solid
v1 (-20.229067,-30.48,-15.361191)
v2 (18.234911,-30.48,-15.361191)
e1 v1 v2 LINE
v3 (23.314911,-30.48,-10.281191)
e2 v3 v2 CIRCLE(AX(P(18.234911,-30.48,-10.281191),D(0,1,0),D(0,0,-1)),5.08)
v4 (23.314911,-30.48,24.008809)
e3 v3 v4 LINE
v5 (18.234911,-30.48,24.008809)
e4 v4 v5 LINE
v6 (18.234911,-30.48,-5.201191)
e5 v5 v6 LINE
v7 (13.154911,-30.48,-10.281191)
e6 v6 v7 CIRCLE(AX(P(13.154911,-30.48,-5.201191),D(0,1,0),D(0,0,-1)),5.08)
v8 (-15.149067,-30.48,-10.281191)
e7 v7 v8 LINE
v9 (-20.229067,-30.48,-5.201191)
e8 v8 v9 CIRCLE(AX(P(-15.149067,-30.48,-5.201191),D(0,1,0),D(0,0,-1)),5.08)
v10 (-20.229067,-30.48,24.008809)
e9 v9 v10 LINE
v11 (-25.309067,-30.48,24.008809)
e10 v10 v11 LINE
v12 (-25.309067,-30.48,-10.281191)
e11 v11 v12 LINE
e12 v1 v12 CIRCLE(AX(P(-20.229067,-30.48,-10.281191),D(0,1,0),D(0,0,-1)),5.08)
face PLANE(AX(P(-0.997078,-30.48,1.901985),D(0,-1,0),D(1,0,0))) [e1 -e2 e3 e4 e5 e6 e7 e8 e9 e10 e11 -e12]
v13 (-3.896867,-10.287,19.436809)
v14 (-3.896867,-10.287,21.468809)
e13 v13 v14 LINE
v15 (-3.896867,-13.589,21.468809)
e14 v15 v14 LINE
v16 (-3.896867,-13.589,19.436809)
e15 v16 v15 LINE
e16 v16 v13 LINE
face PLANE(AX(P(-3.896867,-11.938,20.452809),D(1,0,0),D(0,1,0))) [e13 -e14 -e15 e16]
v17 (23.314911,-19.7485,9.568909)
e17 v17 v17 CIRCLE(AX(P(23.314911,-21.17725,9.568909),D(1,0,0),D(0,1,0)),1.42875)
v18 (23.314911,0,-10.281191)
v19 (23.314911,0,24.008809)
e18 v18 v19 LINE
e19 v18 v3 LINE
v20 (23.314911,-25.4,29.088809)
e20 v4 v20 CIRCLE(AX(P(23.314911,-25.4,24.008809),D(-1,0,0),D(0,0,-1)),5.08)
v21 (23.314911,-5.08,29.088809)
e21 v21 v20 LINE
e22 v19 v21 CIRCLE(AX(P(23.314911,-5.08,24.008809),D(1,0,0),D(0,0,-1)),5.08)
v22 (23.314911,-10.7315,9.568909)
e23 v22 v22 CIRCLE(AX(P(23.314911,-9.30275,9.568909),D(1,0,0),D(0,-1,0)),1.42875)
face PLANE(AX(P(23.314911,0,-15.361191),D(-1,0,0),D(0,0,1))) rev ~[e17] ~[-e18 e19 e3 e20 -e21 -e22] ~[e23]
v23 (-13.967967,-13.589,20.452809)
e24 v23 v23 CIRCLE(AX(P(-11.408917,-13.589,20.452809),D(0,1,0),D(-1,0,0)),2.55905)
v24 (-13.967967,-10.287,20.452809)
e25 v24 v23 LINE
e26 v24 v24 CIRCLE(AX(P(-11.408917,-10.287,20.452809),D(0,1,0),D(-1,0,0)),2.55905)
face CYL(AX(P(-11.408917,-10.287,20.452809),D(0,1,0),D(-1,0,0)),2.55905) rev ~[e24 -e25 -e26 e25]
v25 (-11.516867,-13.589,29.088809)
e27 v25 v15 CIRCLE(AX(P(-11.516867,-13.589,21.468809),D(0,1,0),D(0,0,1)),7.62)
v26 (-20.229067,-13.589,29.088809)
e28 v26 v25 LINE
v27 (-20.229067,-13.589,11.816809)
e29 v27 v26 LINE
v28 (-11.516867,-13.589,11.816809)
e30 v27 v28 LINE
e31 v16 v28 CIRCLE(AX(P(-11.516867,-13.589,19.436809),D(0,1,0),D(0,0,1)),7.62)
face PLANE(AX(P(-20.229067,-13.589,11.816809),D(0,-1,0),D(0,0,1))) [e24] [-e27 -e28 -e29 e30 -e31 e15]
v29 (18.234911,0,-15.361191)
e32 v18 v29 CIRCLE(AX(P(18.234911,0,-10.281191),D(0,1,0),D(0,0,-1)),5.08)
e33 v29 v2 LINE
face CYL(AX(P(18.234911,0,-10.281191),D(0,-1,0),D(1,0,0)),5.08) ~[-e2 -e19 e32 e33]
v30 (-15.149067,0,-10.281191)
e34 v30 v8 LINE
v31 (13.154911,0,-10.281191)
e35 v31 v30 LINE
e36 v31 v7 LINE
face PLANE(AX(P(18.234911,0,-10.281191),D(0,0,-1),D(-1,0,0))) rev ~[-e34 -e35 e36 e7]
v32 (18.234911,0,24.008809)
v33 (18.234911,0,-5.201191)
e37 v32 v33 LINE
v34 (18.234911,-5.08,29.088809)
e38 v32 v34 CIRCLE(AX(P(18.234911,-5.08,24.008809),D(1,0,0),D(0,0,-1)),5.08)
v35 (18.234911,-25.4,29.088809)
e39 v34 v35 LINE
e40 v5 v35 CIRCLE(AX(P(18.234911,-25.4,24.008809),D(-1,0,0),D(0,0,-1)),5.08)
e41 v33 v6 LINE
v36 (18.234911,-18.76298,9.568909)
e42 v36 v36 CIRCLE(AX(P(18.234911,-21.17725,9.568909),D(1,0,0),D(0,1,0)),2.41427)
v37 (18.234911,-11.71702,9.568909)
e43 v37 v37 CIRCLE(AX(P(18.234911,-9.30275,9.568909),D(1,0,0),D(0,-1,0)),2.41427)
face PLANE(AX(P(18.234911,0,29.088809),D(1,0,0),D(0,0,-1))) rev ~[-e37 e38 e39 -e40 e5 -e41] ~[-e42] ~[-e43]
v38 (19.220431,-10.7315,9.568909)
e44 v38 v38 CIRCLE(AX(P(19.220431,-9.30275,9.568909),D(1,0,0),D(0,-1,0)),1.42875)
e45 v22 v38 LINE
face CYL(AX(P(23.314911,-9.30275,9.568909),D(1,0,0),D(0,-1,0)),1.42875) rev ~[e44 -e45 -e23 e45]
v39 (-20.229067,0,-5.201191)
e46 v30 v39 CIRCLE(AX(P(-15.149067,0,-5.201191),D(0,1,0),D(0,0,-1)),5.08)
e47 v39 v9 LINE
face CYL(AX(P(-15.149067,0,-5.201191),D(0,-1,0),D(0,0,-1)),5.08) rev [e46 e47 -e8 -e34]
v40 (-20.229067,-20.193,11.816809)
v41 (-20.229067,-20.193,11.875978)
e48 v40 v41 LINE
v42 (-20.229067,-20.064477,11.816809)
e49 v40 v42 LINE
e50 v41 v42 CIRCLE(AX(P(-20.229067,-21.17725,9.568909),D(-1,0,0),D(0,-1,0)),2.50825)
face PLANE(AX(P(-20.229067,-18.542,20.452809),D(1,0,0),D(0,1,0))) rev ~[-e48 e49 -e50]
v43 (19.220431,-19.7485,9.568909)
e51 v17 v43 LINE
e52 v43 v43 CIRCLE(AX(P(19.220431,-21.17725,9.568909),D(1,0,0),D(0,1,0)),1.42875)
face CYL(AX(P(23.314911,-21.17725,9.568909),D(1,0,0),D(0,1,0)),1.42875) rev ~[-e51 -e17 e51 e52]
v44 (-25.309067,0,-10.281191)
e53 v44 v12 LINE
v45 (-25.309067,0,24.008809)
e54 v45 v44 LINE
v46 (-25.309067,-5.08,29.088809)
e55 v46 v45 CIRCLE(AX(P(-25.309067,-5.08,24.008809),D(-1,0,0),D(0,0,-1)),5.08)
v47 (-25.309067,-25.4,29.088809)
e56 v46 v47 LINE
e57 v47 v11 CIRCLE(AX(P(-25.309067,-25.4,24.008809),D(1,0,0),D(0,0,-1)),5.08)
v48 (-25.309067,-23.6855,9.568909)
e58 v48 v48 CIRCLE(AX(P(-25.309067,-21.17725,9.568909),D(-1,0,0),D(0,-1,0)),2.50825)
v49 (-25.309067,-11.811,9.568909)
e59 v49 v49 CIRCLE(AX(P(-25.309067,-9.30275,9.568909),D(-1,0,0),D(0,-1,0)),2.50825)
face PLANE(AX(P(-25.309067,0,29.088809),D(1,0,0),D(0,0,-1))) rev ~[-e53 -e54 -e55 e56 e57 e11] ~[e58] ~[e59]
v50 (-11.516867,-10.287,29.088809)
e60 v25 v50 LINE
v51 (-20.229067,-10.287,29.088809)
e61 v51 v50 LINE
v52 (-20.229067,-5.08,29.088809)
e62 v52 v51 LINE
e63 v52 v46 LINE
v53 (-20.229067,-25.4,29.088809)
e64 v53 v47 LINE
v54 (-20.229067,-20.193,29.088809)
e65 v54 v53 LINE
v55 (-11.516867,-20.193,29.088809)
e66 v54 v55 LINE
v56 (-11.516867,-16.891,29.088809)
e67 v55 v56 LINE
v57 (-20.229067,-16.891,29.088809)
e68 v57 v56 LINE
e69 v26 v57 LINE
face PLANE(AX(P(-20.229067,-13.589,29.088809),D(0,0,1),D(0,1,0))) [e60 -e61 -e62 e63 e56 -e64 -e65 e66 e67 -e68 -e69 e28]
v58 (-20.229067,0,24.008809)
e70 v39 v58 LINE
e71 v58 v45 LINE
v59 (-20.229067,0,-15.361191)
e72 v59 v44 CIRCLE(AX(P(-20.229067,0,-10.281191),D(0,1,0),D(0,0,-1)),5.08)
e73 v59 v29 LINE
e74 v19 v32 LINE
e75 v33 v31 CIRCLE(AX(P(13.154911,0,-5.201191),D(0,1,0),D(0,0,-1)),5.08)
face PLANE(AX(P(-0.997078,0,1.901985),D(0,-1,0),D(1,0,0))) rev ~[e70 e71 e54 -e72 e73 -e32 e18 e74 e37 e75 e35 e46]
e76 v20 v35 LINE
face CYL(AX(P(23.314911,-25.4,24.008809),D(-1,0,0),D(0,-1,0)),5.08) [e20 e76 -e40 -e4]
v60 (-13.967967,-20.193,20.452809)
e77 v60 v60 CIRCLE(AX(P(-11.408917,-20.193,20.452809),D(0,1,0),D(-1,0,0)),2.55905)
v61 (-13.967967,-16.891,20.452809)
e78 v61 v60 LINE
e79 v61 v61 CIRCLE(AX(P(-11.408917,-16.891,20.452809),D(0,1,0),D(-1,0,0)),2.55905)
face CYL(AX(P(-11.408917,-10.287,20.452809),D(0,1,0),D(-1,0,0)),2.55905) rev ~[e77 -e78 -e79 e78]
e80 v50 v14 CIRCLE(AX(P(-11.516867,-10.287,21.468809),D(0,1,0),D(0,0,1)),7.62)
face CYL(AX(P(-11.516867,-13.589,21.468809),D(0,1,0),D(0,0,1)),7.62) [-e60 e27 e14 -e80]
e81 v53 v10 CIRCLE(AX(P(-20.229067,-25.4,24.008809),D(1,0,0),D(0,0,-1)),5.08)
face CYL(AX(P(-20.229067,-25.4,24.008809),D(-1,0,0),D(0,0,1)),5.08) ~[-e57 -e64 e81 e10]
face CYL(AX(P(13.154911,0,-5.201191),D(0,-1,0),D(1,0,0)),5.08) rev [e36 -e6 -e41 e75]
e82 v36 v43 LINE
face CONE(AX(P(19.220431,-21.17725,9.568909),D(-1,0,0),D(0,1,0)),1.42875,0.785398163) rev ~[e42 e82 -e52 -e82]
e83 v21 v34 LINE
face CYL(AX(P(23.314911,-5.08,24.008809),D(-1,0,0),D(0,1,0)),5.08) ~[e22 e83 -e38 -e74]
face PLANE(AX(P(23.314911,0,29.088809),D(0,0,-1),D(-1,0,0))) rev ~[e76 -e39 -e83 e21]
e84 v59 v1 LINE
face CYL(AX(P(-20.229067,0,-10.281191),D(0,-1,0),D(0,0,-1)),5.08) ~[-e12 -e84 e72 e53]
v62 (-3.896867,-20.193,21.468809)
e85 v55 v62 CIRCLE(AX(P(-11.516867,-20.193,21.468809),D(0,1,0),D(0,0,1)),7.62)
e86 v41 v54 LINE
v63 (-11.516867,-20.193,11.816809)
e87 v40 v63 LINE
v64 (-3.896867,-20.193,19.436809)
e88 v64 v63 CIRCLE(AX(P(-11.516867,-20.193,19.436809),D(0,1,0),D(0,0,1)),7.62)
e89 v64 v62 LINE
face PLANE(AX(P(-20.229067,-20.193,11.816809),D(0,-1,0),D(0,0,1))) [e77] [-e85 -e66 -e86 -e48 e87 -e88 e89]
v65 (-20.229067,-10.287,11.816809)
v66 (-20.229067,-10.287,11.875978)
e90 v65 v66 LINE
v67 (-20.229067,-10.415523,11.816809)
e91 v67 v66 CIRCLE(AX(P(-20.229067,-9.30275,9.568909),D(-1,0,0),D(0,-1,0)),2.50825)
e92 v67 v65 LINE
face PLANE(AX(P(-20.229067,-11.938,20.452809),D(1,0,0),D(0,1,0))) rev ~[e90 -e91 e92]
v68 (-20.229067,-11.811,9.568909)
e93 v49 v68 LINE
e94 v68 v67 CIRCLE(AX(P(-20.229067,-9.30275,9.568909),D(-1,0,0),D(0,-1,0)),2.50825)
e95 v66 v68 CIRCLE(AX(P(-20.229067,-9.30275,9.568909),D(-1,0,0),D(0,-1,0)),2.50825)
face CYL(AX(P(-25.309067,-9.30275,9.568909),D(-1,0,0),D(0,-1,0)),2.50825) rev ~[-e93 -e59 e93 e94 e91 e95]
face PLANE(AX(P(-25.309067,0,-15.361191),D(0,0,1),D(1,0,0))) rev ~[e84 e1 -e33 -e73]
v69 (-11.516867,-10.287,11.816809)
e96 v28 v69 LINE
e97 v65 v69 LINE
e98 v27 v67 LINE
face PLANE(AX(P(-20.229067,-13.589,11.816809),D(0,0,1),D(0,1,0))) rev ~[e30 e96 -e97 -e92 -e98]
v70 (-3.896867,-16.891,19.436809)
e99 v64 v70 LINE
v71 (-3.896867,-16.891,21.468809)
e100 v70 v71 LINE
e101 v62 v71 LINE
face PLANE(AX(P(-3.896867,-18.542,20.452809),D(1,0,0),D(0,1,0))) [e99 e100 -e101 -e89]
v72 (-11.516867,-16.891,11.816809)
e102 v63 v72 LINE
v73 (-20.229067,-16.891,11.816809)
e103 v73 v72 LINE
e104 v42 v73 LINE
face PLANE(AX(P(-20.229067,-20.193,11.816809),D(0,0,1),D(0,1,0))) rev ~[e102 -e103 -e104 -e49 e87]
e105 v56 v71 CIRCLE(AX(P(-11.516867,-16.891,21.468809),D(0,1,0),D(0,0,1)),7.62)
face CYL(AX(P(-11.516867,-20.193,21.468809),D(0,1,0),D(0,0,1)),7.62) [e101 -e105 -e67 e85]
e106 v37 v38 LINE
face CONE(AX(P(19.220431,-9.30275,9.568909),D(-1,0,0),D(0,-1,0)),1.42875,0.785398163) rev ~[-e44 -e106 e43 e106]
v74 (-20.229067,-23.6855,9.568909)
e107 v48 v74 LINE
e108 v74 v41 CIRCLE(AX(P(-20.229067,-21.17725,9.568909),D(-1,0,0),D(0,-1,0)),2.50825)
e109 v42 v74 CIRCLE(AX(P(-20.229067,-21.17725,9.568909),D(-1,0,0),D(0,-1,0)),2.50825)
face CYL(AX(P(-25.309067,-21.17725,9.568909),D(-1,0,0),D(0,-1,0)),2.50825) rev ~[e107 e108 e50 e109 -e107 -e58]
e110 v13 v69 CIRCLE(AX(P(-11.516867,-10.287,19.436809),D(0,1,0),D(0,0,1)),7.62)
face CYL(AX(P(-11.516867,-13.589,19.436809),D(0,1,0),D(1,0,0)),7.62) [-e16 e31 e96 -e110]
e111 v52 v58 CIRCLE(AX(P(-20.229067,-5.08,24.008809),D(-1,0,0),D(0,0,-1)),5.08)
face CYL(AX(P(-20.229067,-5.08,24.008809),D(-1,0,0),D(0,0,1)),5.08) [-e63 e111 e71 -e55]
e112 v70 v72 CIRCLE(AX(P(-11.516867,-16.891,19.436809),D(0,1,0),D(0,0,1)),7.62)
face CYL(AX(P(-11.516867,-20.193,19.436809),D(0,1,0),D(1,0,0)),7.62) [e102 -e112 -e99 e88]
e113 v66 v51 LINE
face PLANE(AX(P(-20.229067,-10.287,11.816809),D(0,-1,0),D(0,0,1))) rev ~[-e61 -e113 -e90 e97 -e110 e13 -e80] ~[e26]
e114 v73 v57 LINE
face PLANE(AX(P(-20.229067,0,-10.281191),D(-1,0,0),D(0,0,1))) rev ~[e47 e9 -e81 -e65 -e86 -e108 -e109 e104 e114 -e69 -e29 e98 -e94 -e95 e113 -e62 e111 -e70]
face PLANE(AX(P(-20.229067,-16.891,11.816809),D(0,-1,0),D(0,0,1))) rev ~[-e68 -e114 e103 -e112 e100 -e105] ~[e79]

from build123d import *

# Parameters (mm, degrees)
F1_DEPTH  = 30.48
F2_R      = 1.42875
F3_DEPTH  = 67.945
F4_R      = 5.08
F5_R      = 5.08
F6_R      = 5.08
F7_SIZE   = 0.98552
F8_R      = 2.50825
F9_DEPTH  = 18.161
F10_W     = 3.302
F10_H     = 17.272
F11_DEPTH = 16.3322
F12_R     = 5.08
F13_R     = 7.62
F14_R     = 7.62
F16_DEPTH = 25.4


# Not quite as in the source:
# - a feature names something its author has since deleted; it is built from what else it names


with BuildPart() as f1:
    # F0 (on Front) → F1 (new body)
    with BuildSketch(Plane.XZ):
        Polygon((-20.2290668074, 29.0888086691), (-25.3090668074, 29.0888086691), (-25.3090668074, -15.3611913309), (23.3149106546, -15.3611913309), (23.3149106546, 29.0888086691), (18.2349106546, 29.0888086691), (18.2349106546, -10.2811913309), (-20.2290668074, -10.2811913309), align=None)
    extrude(amount=F1_DEPTH)

    # F2 (on face) → F3 (cut)
    with BuildSketch(Plane.YZ.offset(23.3149106546)):
        with Locations((-21.17725, 9.5689086691)):
            Circle(F2_R)
        with BuildLine():
            ThreePointArc((-7.874, 9.5689086691), (-9.30275, 10.9976586691), (-10.7315, 9.5689086691))
            ThreePointArc((-10.7315, 9.5689086691), (-9.30275, 8.1401586691), (-7.874, 9.5689086691))
        make_face()
    extrude(amount=-F3_DEPTH, mode=Mode.SUBTRACT)

    # F4
    f4_edges = [f1.edges().sort_by_distance(p)[0] for p in [
        (20.774911, 0, 29.088809),
        (20.774911, -30.48, 29.088809),
    ]]
    fillet(f4_edges, radius=F4_R)

    # F5
    f5_edges = [f1.edges().sort_by_distance(p)[0] for p in [
        (23.314911, -15.24, -15.361191),
        (18.234911, -15.24, -10.281191),
    ]]
    fillet(f5_edges, radius=F5_R)

    # F6
    f6_edges = [f1.edges().sort_by_distance(p)[0] for p in [
        (-20.229067, -15.24, -10.281191),
        (-25.309067, -15.24, -15.361191),
    ]]
    fillet(f6_edges, radius=F6_R)

    # F7
    f7_edges = [f1.edges().sort_by_distance(p)[0] for p in [
        (18.234911, -7.874, 9.568909),
        (18.234911, -22.606, 9.568909),
    ]]
    chamfer(f7_edges, length=F7_SIZE)

    # F8 (on face) → F9 (cut)
    with BuildSketch(Plane(origin=(-25.3090668074, 0, 0), x_dir=(0, -1, 0), z_dir=(-1, 0, 0))):
        with Locations((21.17725, 9.5689086691)):
            Circle(F8_R)
        with Locations((9.30275, 9.5689086691)):
            Circle(F8_R)
    extrude(amount=-F9_DEPTH, mode=Mode.SUBTRACT)

    # F10 (on face) → F11 (join)
    with BuildSketch(Plane.YZ.offset(-20.2290668074)):
        with Locations((-11.938, 20.4528086691)):
            Rectangle(F10_W, F10_H)
        with Locations((-18.542, 20.4528086691)):
            Rectangle(F10_W, F10_H)
    extrude(amount=F11_DEPTH)

    # F12
    f12_edges = [f1.edges().sort_by_distance(p)[0] for p in [
        (-22.769067, 0, 29.088809),
        (-22.769067, -30.48, 29.088809),
    ]]
    fillet(f12_edges, radius=F12_R)

    # F13
    f13_edges = [f1.edges().sort_by_distance(p)[0] for p in [
        (-3.896867, -11.938, 29.088809),
        (-3.896867, -11.938, 11.816809),
    ]]
    fillet(f13_edges, radius=F13_R)

    # F14
    f14_edges = [f1.edges().sort_by_distance(p)[0] for p in [
        (-3.896867, -18.542, 29.088809),
        (-3.896867, -18.542, 11.816809),
    ]]
    fillet(f14_edges, radius=F14_R)

    # F15 (on face) → F16 (cut)
    with BuildSketch(Plane(origin=(0, -10.287, 0), x_dir=(-1, 0, 0), z_dir=(0, 1, 0))):
        with BuildLine():
            ThreePointArc((8.8498668074, 20.4528086691), (11.4089168074, 17.8937586691), (13.9679668074, 20.4528086691))
            ThreePointArc((13.9679668074, 20.4528086691), (11.4089168074, 23.0118586691), (8.8498668074, 20.4528086691))
        make_face()
    extrude(amount=-F16_DEPTH, mode=Mode.SUBTRACT)


solid = f1.part
